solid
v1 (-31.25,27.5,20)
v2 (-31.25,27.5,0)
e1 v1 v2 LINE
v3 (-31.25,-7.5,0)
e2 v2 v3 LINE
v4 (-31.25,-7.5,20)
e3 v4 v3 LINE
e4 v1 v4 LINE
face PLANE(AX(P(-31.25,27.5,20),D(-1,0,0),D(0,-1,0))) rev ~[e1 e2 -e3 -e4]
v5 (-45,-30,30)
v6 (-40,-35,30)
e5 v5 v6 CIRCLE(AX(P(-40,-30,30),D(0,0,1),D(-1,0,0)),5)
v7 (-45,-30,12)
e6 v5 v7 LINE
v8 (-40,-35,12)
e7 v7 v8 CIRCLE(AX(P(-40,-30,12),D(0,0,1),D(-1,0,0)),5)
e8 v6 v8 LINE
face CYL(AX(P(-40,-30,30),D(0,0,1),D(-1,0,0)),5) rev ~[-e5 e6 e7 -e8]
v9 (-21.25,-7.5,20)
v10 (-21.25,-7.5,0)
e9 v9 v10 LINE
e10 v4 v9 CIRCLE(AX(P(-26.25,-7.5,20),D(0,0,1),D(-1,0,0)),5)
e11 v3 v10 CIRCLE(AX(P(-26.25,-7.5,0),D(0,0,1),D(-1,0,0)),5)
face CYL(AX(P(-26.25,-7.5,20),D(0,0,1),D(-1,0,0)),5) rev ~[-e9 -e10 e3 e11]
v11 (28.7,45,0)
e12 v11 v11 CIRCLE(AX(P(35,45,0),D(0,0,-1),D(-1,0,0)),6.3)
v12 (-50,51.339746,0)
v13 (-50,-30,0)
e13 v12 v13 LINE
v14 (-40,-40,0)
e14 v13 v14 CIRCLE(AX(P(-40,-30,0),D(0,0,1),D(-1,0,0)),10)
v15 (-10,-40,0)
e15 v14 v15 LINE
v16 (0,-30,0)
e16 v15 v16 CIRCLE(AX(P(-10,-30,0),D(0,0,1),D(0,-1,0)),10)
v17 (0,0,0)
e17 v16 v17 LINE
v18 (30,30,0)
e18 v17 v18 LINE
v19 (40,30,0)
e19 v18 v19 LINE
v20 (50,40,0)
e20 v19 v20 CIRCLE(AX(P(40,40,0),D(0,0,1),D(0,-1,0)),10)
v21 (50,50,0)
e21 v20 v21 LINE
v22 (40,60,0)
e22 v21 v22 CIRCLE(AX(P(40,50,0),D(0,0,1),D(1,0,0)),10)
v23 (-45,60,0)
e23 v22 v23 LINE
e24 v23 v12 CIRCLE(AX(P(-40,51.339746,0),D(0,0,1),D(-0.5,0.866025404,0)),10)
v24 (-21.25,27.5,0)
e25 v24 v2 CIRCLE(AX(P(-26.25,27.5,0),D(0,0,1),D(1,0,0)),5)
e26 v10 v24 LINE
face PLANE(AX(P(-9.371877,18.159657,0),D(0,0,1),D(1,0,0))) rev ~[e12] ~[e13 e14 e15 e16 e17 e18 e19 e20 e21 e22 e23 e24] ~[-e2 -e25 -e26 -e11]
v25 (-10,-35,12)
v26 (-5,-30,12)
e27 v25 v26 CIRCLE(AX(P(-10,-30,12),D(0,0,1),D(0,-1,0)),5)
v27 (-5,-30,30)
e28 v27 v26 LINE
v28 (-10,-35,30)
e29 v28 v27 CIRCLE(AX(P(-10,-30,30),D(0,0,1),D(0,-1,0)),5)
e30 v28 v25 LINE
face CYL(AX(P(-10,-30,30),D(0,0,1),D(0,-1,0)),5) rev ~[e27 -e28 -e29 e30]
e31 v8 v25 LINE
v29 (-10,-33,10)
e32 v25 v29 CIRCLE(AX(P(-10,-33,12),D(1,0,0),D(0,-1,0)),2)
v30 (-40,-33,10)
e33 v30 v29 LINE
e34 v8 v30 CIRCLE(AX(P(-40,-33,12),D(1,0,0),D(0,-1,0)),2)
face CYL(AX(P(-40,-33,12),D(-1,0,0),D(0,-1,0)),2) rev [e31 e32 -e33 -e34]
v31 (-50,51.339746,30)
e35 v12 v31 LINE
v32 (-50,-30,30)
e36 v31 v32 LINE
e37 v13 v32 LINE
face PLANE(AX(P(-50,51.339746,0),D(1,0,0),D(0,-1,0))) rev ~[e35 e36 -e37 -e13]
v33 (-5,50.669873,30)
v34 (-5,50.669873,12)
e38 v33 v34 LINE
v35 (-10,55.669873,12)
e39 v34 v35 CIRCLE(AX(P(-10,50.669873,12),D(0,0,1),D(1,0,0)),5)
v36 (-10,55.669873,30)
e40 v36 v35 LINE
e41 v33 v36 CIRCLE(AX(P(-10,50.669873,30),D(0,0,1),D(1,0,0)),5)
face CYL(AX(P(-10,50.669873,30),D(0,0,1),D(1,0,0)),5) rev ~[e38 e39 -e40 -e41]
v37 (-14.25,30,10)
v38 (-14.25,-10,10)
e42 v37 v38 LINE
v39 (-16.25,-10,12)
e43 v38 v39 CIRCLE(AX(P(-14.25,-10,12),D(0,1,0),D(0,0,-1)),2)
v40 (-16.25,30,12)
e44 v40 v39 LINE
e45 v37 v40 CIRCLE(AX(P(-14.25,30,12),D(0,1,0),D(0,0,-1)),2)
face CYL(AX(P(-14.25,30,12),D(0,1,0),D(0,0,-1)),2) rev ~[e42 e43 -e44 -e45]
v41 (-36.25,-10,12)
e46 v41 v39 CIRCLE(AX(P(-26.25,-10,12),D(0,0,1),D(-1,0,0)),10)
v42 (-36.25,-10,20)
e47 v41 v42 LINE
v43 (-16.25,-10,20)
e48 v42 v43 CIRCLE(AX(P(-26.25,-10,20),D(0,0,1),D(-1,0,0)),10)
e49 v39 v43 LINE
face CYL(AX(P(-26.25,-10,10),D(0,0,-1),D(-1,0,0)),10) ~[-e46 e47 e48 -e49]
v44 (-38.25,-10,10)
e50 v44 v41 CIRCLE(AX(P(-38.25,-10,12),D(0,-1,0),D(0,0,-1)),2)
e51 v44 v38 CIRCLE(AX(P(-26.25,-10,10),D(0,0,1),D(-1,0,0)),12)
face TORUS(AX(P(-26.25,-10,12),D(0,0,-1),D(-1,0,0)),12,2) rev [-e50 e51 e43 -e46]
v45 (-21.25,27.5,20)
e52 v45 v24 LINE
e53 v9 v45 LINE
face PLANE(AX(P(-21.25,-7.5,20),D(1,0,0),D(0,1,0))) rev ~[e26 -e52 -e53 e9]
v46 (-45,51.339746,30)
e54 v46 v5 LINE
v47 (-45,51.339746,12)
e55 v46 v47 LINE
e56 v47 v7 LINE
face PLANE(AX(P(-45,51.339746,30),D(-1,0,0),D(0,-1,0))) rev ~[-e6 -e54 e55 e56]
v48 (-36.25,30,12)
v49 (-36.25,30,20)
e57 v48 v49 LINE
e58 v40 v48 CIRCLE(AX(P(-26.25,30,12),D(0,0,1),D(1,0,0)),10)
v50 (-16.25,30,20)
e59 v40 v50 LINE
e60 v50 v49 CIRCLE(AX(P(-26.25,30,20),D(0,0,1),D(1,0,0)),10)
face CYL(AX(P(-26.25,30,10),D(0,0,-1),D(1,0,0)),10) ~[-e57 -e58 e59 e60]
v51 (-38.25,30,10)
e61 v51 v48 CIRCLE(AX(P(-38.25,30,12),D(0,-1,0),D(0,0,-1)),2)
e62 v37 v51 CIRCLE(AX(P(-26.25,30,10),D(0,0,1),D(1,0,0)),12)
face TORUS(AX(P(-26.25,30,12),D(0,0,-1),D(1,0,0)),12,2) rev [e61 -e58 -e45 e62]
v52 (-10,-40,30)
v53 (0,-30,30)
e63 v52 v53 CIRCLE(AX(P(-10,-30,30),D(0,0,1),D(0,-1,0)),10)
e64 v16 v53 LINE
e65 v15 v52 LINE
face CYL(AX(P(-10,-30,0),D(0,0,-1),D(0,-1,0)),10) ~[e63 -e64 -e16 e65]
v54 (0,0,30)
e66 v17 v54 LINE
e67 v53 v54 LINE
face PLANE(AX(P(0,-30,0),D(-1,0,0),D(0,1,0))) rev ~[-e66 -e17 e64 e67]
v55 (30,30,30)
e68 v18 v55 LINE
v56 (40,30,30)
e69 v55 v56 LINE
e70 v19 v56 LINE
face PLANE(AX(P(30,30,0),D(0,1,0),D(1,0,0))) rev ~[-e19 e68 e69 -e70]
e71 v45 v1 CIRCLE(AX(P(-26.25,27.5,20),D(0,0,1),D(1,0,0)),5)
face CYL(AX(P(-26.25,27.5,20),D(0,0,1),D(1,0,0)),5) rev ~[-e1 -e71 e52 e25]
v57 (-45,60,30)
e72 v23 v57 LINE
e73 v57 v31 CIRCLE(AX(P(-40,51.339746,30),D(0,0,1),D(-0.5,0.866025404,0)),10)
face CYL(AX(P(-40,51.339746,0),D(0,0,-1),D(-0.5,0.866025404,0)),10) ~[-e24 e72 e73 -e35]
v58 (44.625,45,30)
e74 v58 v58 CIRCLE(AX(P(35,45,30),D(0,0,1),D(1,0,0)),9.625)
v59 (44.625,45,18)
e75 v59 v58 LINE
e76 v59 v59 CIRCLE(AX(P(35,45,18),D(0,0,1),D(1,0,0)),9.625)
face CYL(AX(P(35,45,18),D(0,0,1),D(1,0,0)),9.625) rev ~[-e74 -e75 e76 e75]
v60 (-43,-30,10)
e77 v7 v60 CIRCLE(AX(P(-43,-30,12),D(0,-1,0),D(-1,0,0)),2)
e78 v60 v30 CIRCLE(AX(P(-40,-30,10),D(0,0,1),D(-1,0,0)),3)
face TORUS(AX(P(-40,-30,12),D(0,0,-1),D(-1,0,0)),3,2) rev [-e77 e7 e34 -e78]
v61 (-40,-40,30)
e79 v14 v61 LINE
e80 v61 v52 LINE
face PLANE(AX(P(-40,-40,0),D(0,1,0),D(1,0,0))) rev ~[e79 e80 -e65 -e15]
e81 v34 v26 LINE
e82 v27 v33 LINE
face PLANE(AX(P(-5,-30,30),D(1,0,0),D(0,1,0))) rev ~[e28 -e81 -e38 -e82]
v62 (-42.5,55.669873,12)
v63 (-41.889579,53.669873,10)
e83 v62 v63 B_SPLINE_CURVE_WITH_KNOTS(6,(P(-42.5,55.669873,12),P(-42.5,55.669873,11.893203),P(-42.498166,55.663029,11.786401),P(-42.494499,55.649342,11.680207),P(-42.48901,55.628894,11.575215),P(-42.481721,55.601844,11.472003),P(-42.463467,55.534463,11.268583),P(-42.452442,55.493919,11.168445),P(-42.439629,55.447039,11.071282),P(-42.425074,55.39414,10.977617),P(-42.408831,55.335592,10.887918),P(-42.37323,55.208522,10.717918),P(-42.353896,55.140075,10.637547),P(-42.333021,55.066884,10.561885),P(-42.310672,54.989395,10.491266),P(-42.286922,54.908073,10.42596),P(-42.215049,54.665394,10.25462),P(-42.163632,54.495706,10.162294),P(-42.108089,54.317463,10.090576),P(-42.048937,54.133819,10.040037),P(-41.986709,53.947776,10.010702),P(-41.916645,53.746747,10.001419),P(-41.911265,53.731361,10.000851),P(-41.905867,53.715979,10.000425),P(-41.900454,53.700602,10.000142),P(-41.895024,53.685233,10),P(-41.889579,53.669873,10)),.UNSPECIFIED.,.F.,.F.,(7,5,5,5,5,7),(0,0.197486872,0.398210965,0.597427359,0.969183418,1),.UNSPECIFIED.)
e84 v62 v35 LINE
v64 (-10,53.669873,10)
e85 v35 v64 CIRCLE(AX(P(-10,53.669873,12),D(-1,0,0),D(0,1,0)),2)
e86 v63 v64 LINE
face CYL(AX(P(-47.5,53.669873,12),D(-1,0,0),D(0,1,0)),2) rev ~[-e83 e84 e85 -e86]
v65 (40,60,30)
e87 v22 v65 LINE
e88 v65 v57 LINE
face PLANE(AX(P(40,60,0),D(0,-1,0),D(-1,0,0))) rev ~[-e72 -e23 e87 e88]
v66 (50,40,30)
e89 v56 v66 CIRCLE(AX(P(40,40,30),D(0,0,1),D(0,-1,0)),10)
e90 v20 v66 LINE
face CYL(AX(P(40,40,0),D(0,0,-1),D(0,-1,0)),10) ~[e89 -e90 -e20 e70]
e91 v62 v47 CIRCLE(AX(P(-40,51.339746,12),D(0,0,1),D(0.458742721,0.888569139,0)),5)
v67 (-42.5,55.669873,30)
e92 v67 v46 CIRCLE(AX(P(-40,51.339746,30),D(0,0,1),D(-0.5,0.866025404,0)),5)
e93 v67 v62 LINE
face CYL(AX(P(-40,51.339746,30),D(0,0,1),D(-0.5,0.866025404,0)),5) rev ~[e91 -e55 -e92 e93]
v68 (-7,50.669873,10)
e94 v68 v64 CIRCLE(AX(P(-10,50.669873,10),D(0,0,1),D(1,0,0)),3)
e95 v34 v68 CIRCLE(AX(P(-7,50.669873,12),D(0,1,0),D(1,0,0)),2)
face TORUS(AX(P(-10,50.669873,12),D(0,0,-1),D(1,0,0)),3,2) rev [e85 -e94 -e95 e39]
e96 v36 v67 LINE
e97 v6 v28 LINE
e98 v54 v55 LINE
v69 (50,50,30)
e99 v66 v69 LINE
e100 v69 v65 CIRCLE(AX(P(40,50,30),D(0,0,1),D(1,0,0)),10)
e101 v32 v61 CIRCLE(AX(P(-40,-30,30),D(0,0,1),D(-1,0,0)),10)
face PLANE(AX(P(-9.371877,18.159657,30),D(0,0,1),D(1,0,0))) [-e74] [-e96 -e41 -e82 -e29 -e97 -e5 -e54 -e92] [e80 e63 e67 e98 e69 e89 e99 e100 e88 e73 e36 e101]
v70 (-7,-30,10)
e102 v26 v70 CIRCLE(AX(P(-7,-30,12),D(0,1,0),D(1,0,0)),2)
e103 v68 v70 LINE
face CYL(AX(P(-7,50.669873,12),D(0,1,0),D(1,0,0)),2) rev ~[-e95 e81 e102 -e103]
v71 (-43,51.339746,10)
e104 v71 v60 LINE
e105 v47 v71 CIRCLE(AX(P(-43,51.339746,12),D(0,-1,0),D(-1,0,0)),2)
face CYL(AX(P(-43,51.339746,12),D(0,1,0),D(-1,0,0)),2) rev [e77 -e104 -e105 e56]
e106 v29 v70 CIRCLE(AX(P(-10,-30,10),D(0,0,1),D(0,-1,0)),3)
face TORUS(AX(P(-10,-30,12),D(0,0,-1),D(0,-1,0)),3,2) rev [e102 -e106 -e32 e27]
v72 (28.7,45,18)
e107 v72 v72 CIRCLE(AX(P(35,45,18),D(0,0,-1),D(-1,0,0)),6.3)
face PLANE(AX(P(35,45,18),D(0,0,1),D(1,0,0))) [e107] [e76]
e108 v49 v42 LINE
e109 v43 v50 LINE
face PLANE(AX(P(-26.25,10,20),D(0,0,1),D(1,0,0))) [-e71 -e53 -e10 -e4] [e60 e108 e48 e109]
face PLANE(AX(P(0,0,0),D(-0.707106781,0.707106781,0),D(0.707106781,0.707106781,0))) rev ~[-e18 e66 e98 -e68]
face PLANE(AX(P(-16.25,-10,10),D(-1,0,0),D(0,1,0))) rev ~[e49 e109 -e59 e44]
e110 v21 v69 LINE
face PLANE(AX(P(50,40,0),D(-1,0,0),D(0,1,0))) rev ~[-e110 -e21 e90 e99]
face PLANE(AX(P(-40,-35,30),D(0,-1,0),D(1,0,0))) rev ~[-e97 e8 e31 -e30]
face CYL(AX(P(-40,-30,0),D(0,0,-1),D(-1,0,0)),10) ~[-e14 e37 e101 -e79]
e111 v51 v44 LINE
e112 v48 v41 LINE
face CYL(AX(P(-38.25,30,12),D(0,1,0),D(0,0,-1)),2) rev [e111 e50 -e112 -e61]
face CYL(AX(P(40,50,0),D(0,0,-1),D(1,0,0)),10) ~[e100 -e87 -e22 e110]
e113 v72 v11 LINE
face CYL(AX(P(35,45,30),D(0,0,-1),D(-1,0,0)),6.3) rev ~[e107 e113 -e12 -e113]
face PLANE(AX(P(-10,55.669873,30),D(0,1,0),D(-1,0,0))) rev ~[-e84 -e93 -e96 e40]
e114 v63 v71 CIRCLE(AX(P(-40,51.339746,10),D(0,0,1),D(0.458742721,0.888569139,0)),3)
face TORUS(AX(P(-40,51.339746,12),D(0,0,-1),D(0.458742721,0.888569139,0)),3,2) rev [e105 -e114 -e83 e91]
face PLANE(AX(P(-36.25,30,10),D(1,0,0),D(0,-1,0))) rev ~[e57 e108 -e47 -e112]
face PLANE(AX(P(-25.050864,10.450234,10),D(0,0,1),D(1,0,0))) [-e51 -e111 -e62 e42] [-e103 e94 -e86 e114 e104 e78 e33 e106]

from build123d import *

# Parameters (mm, degrees)
F1_DEPTH       = 30
F3_D           = 12.6
F3_CBORE_D     = 19.25
F3_CBORE_DEPTH = 12
F5_DEPTH       = 20
F7_DEPTH       = 10
F9_T1_DEPTH    = 80.6698729811
F9_T3_DEPTH    = 37.5
F9_T5_DEPTH    = 30
F9_T7_DEPTH    = 81.3397459622
F9_T9_DEPTH    = 40
F9_T12_ANGLE   = 90
F9_T14_ANGLE   = 90
F9_T16_ANGLE   = 117.3060073295
F9_T18_ANGLE   = 90
F9_T20_ANGLE   = 180
F9_T22_ANGLE   = 180
F10_DEPTH      = 20.001


# Not quite as in the source:
# - a fillet or chamfer that OpenCascade refuses, or shapes differently, is made with other operations: its cross-section is extruded or revolved along the edge and cut away or added


with BuildPart() as f1:
    # F0 (on Top) → F1 (new body)
    with BuildSketch(Plane.XY):
        with BuildLine():
            Line((0, -30), (0, 0))
            Line((0, 0), (30, 30))
            Line((30, 30), (40, 30))
            ThreePointArc((40, 30), (47.0710678119, 32.9289321881), (50, 40))
            Line((50, 40), (50, 50))
            ThreePointArc((50, 50), (47.0710678119, 57.0710678119), (40, 60))
            Line((40, 60), (-45, 60))
            ThreePointArc((-45, 60), (-48.6602540378, 56.3397459622), (-50, 51.3397459622))
            Line((-50, 51.3397459622), (-50, -30))
            ThreePointArc((-50, -30), (-47.0710678119, -37.0710678119), (-40, -40))
            Line((-40, -40), (-10, -40))
            ThreePointArc((-10, -40), (-2.9289321881, -37.0710678119), (0, -30))
        make_face()
    extrude(amount=F1_DEPTH)

    # F3 (through all)
    with Locations(Plane.XY.offset(30)):
        with Locations((35, 45)):
            CounterBoreHole(F3_D / 2, F3_CBORE_D / 2, F3_CBORE_DEPTH)

    # F4 (on face) → F5 (cut)
    with BuildSketch(Plane.XY.offset(30)):
        with BuildLine():
            Line((-10, 55.6698729811), (-42.5, 55.6698729811))
            ThreePointArc((-42.5, 55.6698729811), (-44.3301270189, 53.8397459622), (-45, 51.3397459622))
            Line((-45, 51.3397459622), (-45, -30))
            ThreePointArc((-45, -30), (-43.5355339059, -33.5355339059), (-40, -35))
            Line((-40, -35), (-10, -35))
            ThreePointArc((-10, -35), (-6.4644660941, -33.5355339059), (-5, -30))
            Line((-5, -30), (-5, 50.6698729811))
            ThreePointArc((-5, 50.6698729811), (-6.4644660941, 54.205406887), (-10, 55.6698729811))
        make_face()
    extrude(amount=-F5_DEPTH, mode=Mode.SUBTRACT)

    # F6 (on face) → F7 (join)
    with BuildSketch(Plane.XY.offset(10)):
        with BuildLine():
            ThreePointArc((-16.25, 30), (-26.25, 40), (-36.25, 30))
            Line((-36.25, 30), (-36.25, -10))
            ThreePointArc((-36.25, -10), (-26.25, -20), (-16.25, -10))
            Line((-16.25, -10), (-16.25, 30))
        make_face()
    extrude(amount=F7_DEPTH)

    # F9: fillet of radius 2 on 12 edges, made by hand

    # F9_s2 → F9_t1 (join)
    with BuildSketch(Plane.XZ.offset(-50.6698729811)):
        with BuildLine():
            ThreePointArc((-5, 12), (-5.5857864376, 10.5857864376), (-7, 10))
            Line((-7, 10), (-5, 10))
            Line((-5, 10), (-5, 12))
        make_face()
    extrude(amount=F9_T1_DEPTH)

    # F9_s4 → F9_t3 (join)
    with BuildSketch(Plane.YZ.offset(-47.5)):
        with BuildLine():
            ThreePointArc((55.6698729811, 12), (55.0840865435, 10.5857864376), (53.6698729811, 10))
            Line((53.6698729811, 10), (55.6698729811, 10))
            Line((55.6698729811, 10), (55.6698729811, 12))
        make_face()
    extrude(amount=F9_T3_DEPTH)

    # F9_s6 → F9_t5 (join)
    with BuildSketch(Plane.YZ.offset(-40)):
        with BuildLine():
            ThreePointArc((-35, 12), (-34.4142135624, 10.5857864376), (-33, 10))
            Line((-33, 10), (-35, 10))
            Line((-35, 10), (-35, 12))
        make_face()
    extrude(amount=F9_T5_DEPTH)

    # F9_s8 → F9_t7 (join)
    with BuildSketch(Plane.XZ.offset(-51.3397459622)):
        with BuildLine():
            ThreePointArc((-45, 12), (-44.4142135624, 10.5857864376), (-43, 10))
            Line((-43, 10), (-45, 10))
            Line((-45, 10), (-45, 12))
        make_face()
    extrude(amount=F9_T7_DEPTH)

    # F9_s10 → F9_t9 (join)
    with BuildSketch(Plane.XZ.offset(-30)):
        with BuildLine():
            ThreePointArc((-14.25, 10), (-15.6642135624, 10.5857864376), (-16.25, 12))
            Line((-16.25, 12), (-16.25, 10))
            Line((-16.25, 10), (-14.25, 10))
        make_face()
        with BuildLine():
            ThreePointArc((-38.25, 10), (-36.8357864376, 10.5857864376), (-36.25, 12))
            Line((-36.25, 12), (-36.25, 10))
            Line((-36.25, 10), (-38.25, 10))
        make_face()
    extrude(amount=F9_T9_DEPTH)

    # F9_s11 → F9_t12 (revolve)
    with BuildSketch(Plane.XZ.offset(-50.6698729811)):
        with BuildLine():
            ThreePointArc((-5, 12), (-5.5857864376, 10.5857864376), (-7, 10))
            Line((-7, 10), (-5, 10))
            Line((-5, 10), (-5, 12))
        make_face()
    revolve(axis=Axis((-10, 50.6698729811, 10), (0, 0, 1)), revolution_arc=F9_T12_ANGLE)

    # F9_s13 → F9_t14 (revolve)
    with BuildSketch(Plane.YZ.offset(-10)):
        with BuildLine():
            ThreePointArc((-35, 12), (-34.4142135624, 10.5857864376), (-33, 10))
            Line((-33, 10), (-35, 10))
            Line((-35, 10), (-35, 12))
        make_face()
    revolve(axis=Axis((-10, -30, 10), (0, 0, 1)), revolution_arc=F9_T14_ANGLE)

    # F9_s15 → F9_t16 (revolve)
    with BuildSketch(Plane(origin=(-52.509549327, 27.1091719145, 0), x_dir=(0, 0, 1), z_dir=(0.8885691394, -0.4587427214, 0))):
        with BuildLine():
            ThreePointArc((12, -32.2692050314), (10.5857864376, -31.6834185938), (10, -30.2692050314))
            Line((10, -30.2692050314), (10, -32.2692050314))
            Line((10, -32.2692050314), (12, -32.2692050314))
        make_face()
    revolve(axis=Axis((-40, 51.3397459622, 10), (0, 0, 1)), revolution_arc=F9_T16_ANGLE)

    # F9_s17 → F9_t18 (revolve)
    with BuildSketch(Plane.XZ.offset(30)):
        with BuildLine():
            ThreePointArc((-45, 12), (-44.4142135624, 10.5857864376), (-43, 10))
            Line((-43, 10), (-45, 10))
            Line((-45, 10), (-45, 12))
        make_face()
    revolve(axis=Axis((-40, -30, 10), (0, 0, 1)), revolution_arc=F9_T18_ANGLE)

    # F9_s19 → F9_t20 (revolve)
    with BuildSketch(Plane.XZ.offset(10)):
        with BuildLine():
            ThreePointArc((-38.25, 10), (-36.8357864376, 10.5857864376), (-36.25, 12))
            Line((-36.25, 12), (-36.25, 10))
            Line((-36.25, 10), (-38.25, 10))
        make_face()
    revolve(axis=Axis((-26.25, -10, 10), (0, 0, 1)), revolution_arc=F9_T20_ANGLE)

    # F9_s21 → F9_t22 (revolve)
    with BuildSketch(Plane.XZ.offset(-30)):
        with BuildLine():
            ThreePointArc((-14.25, 10), (-15.6642135624, 10.5857864376), (-16.25, 12))
            Line((-16.25, 12), (-16.25, 10))
            Line((-16.25, 10), (-14.25, 10))
        make_face()
    revolve(axis=Axis((-26.25, 30, 10), (0, 0, 1)), revolution_arc=F9_T22_ANGLE)

    # F8 (on face) → F10 (cut, through all)
    with BuildSketch(Plane.XY.offset(20)):
        with BuildLine():
            ThreePointArc((-31.25, -7.5), (-26.25, -12.5), (-21.25, -7.5))
            Line((-21.25, -7.5), (-21.25, 27.5))
            ThreePointArc((-21.25, 27.5), (-26.25, 32.5), (-31.25, 27.5))
            Line((-31.25, 27.5), (-31.25, -7.5))
        make_face()
    extrude(amount=-F10_DEPTH, mode=Mode.SUBTRACT)


solid = f1.part
